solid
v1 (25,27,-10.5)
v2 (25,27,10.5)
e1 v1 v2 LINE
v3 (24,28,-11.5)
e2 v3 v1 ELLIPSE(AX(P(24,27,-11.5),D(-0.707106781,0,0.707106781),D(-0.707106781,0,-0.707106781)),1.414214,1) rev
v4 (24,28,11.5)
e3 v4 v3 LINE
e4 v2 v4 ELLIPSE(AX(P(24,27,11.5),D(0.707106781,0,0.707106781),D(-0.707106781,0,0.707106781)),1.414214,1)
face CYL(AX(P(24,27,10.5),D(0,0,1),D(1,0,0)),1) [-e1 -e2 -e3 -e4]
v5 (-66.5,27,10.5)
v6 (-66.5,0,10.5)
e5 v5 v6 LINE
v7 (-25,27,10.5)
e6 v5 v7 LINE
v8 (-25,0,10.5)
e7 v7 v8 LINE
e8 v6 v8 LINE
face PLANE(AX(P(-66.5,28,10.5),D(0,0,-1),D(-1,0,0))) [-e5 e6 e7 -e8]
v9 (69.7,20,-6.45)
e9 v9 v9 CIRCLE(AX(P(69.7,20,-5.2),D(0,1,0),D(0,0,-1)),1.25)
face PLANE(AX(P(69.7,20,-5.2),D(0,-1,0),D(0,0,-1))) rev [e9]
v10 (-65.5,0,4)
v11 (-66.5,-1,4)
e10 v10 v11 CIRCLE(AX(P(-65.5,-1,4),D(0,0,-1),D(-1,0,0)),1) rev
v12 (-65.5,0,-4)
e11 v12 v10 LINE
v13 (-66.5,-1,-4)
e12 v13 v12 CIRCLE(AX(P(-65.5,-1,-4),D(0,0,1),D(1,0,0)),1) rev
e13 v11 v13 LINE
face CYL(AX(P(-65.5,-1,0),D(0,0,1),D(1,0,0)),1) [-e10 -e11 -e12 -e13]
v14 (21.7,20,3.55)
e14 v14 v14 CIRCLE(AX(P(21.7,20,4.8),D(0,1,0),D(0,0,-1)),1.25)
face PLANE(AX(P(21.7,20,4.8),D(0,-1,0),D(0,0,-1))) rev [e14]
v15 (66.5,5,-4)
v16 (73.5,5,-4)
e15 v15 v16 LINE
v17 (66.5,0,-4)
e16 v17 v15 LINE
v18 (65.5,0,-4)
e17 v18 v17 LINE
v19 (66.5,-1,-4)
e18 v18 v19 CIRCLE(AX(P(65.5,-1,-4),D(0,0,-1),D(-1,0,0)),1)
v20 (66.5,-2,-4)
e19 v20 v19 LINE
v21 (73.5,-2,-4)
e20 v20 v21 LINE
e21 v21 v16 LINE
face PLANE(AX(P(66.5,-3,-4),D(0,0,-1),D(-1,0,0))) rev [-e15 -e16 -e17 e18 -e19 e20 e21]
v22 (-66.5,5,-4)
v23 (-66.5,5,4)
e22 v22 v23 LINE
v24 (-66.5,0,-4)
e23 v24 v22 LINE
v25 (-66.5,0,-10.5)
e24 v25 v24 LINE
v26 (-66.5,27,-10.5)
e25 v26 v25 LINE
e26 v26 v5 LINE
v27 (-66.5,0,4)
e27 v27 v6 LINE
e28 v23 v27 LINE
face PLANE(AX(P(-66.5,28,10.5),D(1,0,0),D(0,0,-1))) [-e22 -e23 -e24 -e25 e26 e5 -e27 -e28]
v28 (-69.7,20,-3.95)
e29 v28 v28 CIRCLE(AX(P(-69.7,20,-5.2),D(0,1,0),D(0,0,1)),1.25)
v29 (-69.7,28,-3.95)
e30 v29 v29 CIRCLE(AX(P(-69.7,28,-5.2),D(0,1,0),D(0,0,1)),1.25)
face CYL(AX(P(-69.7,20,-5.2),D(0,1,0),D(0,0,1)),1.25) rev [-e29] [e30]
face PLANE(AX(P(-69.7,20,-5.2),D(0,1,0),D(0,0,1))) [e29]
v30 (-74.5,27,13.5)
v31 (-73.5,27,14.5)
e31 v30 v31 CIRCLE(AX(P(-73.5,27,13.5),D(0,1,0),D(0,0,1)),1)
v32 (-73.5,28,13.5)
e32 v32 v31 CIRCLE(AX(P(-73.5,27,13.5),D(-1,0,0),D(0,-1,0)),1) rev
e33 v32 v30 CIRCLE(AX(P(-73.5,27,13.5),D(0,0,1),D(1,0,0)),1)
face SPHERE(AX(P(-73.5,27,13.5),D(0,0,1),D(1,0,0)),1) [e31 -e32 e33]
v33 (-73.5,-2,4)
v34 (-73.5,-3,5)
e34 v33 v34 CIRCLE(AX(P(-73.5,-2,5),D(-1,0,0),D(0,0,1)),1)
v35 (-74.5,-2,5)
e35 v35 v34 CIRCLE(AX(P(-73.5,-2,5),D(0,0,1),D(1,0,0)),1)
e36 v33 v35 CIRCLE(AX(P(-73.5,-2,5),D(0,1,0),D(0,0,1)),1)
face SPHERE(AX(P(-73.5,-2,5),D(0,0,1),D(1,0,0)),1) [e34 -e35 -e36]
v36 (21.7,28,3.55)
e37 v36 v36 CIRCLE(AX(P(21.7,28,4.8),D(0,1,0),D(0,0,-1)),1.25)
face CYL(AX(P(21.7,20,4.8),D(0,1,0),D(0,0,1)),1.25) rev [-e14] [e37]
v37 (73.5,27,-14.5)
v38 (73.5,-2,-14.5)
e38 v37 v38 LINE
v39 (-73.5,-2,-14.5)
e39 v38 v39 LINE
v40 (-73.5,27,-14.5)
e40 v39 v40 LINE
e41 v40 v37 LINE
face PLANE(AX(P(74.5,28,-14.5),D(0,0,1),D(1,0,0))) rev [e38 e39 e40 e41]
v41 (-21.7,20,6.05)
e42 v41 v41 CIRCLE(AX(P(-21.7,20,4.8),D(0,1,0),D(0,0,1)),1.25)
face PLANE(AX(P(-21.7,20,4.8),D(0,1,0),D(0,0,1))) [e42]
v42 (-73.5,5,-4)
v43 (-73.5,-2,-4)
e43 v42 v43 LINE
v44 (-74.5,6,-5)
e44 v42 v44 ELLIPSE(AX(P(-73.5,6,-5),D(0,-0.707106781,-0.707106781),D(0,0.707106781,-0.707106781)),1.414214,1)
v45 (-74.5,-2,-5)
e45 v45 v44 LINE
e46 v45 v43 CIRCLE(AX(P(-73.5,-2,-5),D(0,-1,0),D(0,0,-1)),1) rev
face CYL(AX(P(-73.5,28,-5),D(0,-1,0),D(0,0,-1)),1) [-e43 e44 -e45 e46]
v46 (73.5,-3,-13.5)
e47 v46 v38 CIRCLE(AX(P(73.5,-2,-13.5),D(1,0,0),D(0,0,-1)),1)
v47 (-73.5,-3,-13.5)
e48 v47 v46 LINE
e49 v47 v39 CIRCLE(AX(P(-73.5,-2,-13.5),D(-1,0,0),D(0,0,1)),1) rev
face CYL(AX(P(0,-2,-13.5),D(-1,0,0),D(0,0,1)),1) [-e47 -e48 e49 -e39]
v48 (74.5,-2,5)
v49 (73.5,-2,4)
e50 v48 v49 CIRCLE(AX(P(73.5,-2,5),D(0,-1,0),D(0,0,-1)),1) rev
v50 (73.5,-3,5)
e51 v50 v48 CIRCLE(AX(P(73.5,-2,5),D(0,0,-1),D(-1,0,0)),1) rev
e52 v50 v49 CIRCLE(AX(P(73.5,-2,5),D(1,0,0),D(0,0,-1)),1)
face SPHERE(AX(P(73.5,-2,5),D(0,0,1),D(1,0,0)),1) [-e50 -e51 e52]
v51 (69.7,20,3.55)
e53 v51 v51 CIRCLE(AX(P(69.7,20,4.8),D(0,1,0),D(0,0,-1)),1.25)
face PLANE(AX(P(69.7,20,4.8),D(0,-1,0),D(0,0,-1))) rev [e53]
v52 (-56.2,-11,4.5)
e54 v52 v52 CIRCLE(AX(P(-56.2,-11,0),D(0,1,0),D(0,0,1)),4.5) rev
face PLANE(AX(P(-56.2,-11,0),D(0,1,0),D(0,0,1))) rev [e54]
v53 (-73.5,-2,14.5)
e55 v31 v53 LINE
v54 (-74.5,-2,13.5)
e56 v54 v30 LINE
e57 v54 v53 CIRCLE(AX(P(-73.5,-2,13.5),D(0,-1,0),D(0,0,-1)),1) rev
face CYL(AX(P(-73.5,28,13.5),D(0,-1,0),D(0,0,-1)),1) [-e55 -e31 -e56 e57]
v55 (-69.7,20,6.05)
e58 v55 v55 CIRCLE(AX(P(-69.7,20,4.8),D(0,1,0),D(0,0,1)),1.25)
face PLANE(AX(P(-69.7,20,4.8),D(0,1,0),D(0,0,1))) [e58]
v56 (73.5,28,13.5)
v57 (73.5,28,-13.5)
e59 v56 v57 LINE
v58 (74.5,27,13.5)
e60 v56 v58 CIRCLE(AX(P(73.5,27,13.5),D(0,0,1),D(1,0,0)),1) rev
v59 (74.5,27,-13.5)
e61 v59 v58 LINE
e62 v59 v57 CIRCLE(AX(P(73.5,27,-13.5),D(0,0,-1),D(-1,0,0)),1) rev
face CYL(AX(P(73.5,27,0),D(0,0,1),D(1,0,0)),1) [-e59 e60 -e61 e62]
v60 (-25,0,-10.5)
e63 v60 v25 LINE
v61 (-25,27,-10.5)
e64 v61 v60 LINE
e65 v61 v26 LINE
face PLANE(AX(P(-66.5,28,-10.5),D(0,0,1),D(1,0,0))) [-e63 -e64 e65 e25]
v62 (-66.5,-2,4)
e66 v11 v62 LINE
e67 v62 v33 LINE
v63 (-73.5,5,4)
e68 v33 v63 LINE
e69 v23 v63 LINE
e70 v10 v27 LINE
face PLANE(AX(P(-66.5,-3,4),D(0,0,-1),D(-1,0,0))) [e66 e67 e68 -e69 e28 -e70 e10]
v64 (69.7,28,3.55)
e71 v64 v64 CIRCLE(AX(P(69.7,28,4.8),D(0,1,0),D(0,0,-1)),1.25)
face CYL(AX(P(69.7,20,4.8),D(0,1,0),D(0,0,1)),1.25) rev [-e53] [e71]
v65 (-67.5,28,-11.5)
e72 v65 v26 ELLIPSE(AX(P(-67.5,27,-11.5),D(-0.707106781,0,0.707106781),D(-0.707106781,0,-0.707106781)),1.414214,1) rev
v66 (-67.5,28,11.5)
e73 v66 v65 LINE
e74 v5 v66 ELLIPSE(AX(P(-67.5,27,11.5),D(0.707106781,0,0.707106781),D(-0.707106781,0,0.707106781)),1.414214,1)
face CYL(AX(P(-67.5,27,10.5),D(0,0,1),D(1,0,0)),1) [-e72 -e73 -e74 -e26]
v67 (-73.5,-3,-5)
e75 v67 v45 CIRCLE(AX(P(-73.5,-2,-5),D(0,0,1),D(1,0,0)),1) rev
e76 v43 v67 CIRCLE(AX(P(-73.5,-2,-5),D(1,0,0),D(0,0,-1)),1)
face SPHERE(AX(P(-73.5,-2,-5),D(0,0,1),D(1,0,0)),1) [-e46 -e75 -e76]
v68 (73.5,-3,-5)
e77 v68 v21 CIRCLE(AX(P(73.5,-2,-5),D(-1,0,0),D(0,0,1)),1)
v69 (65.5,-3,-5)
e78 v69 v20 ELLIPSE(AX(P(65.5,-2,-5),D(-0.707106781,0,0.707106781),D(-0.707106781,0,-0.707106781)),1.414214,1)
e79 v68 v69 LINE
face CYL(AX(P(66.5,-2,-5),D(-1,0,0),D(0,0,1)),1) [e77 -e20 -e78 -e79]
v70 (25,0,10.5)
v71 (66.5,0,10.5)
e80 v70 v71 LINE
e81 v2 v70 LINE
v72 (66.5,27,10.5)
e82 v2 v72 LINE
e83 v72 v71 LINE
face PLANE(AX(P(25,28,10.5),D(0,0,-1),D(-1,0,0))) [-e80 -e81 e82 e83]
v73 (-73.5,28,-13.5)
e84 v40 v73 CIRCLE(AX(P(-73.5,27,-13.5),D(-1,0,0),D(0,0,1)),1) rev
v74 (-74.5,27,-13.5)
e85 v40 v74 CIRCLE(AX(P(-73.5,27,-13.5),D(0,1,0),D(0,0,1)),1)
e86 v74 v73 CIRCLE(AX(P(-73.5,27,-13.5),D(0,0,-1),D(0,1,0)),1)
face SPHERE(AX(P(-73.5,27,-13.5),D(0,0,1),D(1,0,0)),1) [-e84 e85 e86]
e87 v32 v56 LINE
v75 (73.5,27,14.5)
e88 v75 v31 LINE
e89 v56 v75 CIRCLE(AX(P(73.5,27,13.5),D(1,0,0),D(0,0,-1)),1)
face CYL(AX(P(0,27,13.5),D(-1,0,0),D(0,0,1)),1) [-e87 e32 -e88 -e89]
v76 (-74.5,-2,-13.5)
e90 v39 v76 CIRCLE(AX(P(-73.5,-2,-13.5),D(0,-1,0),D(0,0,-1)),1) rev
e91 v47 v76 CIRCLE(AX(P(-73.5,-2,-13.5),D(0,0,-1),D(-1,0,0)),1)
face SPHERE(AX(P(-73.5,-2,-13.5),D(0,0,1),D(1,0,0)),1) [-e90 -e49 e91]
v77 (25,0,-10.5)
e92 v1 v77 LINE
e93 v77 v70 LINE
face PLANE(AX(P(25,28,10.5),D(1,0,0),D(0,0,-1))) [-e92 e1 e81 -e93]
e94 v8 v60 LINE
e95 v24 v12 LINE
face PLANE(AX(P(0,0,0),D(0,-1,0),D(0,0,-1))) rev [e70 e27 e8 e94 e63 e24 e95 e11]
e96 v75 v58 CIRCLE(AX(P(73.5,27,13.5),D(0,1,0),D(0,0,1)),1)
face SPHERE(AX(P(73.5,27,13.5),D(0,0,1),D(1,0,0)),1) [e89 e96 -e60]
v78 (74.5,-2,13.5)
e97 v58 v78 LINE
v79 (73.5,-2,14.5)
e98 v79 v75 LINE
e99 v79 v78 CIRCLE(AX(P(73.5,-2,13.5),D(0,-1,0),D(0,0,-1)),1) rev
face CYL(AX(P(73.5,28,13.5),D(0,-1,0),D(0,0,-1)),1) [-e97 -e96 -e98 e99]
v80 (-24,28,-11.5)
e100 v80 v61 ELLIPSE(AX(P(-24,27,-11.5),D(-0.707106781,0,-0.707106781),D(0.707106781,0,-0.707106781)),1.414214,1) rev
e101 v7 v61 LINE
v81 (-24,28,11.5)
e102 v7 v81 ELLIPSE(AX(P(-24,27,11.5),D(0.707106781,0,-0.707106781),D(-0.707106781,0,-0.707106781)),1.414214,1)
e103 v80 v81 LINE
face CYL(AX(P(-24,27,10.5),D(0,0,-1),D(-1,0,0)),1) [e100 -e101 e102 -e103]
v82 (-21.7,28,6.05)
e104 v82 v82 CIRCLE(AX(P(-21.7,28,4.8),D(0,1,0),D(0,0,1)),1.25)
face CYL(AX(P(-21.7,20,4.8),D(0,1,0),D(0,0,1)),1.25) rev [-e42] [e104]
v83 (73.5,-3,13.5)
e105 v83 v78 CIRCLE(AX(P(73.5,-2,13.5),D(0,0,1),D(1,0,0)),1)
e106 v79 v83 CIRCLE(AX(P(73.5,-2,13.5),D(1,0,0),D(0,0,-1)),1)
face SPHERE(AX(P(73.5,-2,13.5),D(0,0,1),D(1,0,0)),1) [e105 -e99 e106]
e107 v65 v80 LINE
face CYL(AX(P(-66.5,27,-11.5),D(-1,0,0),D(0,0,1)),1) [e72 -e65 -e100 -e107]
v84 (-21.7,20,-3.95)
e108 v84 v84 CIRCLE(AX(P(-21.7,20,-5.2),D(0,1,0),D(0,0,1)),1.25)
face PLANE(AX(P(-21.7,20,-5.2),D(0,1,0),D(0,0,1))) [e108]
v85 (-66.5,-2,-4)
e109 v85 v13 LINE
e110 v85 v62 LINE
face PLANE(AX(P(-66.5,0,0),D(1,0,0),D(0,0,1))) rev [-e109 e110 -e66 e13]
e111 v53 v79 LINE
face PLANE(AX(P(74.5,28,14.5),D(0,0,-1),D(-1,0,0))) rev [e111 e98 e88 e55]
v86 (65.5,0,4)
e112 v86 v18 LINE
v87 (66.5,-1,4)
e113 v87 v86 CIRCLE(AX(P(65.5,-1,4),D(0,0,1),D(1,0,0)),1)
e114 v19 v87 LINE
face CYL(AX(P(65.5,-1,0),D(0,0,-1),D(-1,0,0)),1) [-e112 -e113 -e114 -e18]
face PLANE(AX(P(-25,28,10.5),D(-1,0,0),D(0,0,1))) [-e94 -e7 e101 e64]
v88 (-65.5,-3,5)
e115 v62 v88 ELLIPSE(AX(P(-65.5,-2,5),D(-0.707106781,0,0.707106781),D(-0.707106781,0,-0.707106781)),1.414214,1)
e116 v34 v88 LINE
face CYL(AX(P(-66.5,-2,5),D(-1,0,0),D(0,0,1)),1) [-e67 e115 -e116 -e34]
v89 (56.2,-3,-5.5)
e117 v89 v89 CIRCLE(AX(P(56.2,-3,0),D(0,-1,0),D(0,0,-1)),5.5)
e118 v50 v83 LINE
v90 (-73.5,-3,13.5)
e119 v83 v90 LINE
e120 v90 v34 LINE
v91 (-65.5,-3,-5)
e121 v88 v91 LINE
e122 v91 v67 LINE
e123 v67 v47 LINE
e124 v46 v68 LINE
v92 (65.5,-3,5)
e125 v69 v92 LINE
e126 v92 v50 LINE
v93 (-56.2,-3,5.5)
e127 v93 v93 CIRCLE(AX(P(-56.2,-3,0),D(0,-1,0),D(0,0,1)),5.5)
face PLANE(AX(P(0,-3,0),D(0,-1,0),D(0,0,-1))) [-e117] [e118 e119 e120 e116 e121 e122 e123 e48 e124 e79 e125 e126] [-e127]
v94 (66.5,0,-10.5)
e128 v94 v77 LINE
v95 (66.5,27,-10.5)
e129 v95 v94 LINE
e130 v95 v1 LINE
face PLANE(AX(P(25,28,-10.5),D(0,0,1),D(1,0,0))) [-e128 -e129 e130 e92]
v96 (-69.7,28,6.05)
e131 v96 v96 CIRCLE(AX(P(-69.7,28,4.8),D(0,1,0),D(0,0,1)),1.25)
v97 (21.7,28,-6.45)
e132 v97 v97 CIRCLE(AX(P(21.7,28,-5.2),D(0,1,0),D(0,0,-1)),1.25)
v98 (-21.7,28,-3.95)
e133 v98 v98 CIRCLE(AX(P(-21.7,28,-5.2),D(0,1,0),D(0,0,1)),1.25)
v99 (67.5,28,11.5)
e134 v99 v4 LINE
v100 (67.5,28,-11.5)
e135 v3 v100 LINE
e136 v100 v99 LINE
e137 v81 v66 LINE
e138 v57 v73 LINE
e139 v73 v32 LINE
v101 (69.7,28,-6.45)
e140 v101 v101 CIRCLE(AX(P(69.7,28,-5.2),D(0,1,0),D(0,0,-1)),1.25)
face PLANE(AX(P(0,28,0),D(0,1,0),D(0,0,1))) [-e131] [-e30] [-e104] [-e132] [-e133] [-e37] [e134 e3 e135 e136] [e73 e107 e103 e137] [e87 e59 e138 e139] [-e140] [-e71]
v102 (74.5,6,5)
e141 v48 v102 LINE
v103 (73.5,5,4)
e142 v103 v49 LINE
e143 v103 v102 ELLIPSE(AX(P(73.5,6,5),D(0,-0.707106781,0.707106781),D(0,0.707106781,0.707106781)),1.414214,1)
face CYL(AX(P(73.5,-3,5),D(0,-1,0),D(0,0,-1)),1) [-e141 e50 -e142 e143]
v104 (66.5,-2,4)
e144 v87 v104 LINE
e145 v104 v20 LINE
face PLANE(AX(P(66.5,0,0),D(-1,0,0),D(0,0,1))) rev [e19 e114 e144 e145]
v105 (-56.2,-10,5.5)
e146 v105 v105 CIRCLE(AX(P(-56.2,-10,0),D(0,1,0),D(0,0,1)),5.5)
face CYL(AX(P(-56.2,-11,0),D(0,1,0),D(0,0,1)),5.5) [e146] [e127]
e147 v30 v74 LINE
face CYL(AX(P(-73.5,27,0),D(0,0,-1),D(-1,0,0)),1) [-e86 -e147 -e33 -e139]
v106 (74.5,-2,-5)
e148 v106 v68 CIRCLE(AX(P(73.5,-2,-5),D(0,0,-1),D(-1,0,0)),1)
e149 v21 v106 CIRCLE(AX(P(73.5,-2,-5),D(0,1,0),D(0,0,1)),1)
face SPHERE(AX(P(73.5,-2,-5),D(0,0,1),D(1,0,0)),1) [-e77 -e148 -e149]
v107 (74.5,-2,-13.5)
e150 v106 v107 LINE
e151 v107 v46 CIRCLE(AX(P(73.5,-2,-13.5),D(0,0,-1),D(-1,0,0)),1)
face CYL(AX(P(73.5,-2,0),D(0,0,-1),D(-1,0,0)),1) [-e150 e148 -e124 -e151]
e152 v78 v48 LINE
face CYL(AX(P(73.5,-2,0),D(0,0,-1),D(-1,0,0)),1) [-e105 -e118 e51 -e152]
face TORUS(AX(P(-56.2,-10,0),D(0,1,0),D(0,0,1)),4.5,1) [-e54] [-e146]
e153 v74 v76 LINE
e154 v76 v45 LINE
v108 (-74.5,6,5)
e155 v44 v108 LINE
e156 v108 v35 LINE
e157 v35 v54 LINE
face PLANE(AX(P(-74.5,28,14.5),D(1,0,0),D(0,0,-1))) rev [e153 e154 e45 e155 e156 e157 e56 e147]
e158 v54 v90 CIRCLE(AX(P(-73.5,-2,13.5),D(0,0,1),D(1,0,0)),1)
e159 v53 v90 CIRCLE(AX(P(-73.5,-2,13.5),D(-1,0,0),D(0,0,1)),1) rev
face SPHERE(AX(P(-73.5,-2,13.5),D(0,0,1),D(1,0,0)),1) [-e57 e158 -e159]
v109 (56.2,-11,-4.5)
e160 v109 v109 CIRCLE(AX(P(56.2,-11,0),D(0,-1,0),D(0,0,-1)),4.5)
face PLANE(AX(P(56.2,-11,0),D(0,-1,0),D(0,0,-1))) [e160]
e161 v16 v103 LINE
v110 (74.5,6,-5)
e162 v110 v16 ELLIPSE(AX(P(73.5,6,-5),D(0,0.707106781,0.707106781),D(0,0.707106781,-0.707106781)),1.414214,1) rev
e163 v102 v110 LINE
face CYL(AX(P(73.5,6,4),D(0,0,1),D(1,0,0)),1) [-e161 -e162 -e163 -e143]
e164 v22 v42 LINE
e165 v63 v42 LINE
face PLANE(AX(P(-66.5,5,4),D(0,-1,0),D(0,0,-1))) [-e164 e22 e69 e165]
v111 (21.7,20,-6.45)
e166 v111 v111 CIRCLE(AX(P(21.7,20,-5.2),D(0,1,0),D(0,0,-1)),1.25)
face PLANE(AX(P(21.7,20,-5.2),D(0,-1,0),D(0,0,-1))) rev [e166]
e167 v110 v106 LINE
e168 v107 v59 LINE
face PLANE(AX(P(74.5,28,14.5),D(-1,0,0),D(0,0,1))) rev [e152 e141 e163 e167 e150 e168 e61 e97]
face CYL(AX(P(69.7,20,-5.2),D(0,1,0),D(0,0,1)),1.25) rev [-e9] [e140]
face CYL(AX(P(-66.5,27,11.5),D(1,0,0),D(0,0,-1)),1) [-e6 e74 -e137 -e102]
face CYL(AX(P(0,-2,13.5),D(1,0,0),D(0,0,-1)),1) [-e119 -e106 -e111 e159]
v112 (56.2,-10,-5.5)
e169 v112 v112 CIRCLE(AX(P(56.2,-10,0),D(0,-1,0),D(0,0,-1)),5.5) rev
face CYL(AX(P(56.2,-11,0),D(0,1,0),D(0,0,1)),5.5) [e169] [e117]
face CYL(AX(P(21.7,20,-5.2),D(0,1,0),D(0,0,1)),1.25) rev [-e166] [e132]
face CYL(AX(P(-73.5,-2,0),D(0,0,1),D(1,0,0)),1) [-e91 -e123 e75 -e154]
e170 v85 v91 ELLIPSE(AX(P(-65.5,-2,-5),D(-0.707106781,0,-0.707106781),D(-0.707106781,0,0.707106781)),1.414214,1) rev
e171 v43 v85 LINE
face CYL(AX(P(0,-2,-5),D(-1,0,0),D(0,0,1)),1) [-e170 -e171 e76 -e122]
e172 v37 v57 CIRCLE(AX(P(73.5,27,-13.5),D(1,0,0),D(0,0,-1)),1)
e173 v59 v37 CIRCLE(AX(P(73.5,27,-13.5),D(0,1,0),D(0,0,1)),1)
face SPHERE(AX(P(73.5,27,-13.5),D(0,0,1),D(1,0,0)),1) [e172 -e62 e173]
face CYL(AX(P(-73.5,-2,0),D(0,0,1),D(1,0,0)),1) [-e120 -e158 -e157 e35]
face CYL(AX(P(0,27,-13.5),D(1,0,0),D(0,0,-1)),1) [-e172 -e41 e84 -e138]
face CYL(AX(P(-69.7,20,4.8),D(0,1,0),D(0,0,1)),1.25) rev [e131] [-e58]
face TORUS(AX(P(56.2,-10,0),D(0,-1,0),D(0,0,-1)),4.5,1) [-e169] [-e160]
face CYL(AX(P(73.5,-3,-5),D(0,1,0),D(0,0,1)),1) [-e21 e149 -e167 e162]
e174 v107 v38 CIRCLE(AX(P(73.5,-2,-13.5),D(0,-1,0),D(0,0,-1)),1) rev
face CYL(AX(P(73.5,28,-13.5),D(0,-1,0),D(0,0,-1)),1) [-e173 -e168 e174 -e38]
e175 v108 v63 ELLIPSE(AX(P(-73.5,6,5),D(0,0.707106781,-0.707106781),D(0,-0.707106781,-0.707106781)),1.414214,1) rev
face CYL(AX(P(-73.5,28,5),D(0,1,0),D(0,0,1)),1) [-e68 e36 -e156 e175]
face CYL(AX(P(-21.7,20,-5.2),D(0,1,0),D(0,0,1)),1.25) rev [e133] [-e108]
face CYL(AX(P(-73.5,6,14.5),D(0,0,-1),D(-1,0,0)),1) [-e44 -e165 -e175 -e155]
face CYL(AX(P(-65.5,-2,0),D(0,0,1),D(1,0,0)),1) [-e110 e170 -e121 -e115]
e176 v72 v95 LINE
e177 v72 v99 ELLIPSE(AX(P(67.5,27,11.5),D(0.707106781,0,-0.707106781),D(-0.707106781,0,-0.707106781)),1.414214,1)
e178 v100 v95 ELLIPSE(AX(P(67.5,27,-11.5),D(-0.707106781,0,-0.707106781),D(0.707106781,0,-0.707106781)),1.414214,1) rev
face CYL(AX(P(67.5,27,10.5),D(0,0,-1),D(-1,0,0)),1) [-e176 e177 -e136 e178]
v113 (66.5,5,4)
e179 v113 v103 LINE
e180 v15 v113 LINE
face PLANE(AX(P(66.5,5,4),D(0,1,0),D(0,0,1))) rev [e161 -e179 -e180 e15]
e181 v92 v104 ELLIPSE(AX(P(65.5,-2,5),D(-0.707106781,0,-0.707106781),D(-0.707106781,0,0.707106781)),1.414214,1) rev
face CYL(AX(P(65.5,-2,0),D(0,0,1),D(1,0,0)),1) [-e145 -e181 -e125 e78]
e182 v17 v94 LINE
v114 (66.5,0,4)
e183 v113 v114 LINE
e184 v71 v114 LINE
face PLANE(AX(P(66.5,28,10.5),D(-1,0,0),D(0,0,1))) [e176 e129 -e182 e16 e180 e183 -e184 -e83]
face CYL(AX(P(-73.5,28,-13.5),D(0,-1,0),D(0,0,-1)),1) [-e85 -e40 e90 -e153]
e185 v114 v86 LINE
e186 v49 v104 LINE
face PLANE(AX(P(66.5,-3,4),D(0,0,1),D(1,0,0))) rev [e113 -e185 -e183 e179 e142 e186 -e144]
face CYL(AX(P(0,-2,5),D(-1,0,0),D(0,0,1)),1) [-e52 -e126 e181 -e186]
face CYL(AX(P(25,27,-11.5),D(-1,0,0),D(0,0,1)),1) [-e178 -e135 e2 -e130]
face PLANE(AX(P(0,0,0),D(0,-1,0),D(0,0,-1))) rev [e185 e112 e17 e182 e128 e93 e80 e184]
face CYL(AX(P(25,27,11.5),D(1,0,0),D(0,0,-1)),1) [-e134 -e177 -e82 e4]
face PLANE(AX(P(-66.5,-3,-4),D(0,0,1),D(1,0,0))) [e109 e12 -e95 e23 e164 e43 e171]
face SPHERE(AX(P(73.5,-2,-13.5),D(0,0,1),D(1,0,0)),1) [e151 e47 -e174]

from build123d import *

# Parameters (mm, degrees)
SKETCH_1_W          = 149
SKETCH_1_H          = 29
SKETCH_1_W_2        = 41.5
SKETCH_1_H_2        = 21
EXTRUDE_1_DEPTH     = 28
SKETCH_2_W          = 149
SKETCH_2_H          = 29
EXTRUDE_2_DEPTH     = 3
SKETCH_3_W          = 8
SKETCH_3_H          = 8
CUT_EXTRUDE_1_DEPTH = 8
SKETCH_4_R          = 5.5
EXTRUDE_3_DEPTH     = 8
FILLET_1_R          = 1
FILLET_5_R          = 1
FILLET_6_R          = 1
SKETCH_5_R          = 1.25
CUT_EXTRUDE_2_DEPTH = 8


with BuildPart() as part:
    # 草图1 → 凸台-拉伸1 (new body)
    with BuildSketch(Plane(origin=(0, 0, 0), x_dir=(1, 0, 0), z_dir=(0, 1, 0))):
        Rectangle(SKETCH_1_W, SKETCH_1_H)
        with Locations((-45.75, 0)):
            Rectangle(SKETCH_1_W_2, SKETCH_1_H_2, mode=Mode.SUBTRACT)
        with Locations((45.75, 0)):
            Rectangle(SKETCH_1_W_2, SKETCH_1_H_2, mode=Mode.SUBTRACT)
    extrude(amount=EXTRUDE_1_DEPTH)

    # 草图2 → 凸台-拉伸2 (add)
    with BuildSketch(Plane.XZ):
        Rectangle(SKETCH_2_W, SKETCH_2_H)
    extrude(amount=EXTRUDE_2_DEPTH)

    # 草图3 → 切除-拉伸1 (cut)
    with BuildSketch(Plane(origin=(74.5, 0, 0), x_dir=(0, 0, -1), z_dir=(1, 0, 0))):
        with Locations((0, 1)):
            Rectangle(SKETCH_3_W, SKETCH_3_H)
    cut_extrude_1 = extrude(amount=-CUT_EXTRUDE_1_DEPTH, mode=Mode.SUBTRACT)

    # 镜向1: 切除-拉伸1 across plane
    add(cut_extrude_1.mirror(Plane(origin=(0, 0, 0), x_dir=(0, 0, 1), z_dir=(1, 0, 0))), mode=Mode.SUBTRACT)

    # 草图4 → 凸台-拉伸3 (add)
    with BuildSketch(Plane(origin=(0, -3, 0), x_dir=(-1, 0, 0), z_dir=(0, -1, 0))):
        with Locations(Location((-56.2, 0, 0), (0, 0, 90))):
            Circle(SKETCH_4_R)
        with Locations(Location((56.2, 0, 0), (0, 0, 270))):
            Circle(SKETCH_4_R)
    extrude(amount=EXTRUDE_3_DEPTH)

    # 圆角1
    fillet_1_edges = [part.edges().sort_by_distance(p)[0] for p in [
        (-56.2, -11, -5.5),
        (56.2, -11, 5.5),
    ]]
    fillet(fillet_1_edges, radius=FILLET_1_R)

    # 圆角5
    fillet_5_edges = [part.edges().sort_by_distance(p)[0] for p in [
        (74.5, 28, 0),
        (0, 28, -14.5),
        (-66.5, 28, 0),
        (-45.75, 28, 10.5),
        (-25, 28, 0),
        (-45.75, 28, -10.5),
        (25, 28, 0),
        (45.75, 28, 10.5),
        (66.5, 28, 0),
        (45.75, 28, -10.5),
        (-74.5, 28, 0),
        (-74.5, -3, 9.25),
        (0, -3, -14.5),
        (74.5, -3, -9.25),
        (0, -3, 14.5),
        (74.5, -3, 9.25),
        (74.5, 1, 4),
        (74.5, 1, -4),
        (74.5, 5, 0),
        (0, 28, 14.5),
        (-74.5, 12.5, -14.5),
        (74.5, 12.5, -14.5),
        (74.5, 12.5, 14.5),
        (-74.5, 12.5, 14.5),
        (-74.5, -3, -9.25),
        (-74.5, 1, 4),
        (-74.5, 1, -4),
        (-74.5, 5, 0),
    ]]
    fillet(fillet_5_edges, radius=FILLET_5_R)

    # 圆角6
    # the kernel refuses this fillet: 1 mm, written as the material it takes off along each edge
    with BuildSketch(Plane(origin=(-73.5, -2, 5), x_dir=(0, 0, -1), z_dir=(0, -1, 0))) as fillet_6_piece_1_section:
        Polygon((0, 0), (FILLET_6_R * 1.02, 0), (FILLET_6_R * 1.02, -FILLET_6_R * 1.02), (0, -FILLET_6_R * 1.02), align=None)
    fillet_6_piece_1 = extrude(amount=FILLET_6_R * 1.02, mode=Mode.PRIVATE)
    fillet_6_piece_1 = fillet_6_piece_1 - Plane(origin=(-73.5, -2, 5), x_dir=(0.7071067811865475, 0, 0.7071067811865475), z_dir=(0, -1, 0)) * Sphere(FILLET_6_R, mode=Mode.PRIVATE)
    add(fillet_6_piece_1, mode=Mode.SUBTRACT)
    with BuildSketch(Plane(origin=(-73.5, -2, -5), x_dir=(0, 0, 1), z_dir=(0, -1, 0))) as fillet_6_piece_2_section:
        Polygon((0, 0), (FILLET_6_R * 1.02, 0), (FILLET_6_R * 1.02, FILLET_6_R * 1.02), (0, FILLET_6_R * 1.02), align=None)
    fillet_6_piece_2 = extrude(amount=FILLET_6_R * 1.02, mode=Mode.PRIVATE)
    fillet_6_piece_2 = fillet_6_piece_2 - Plane(origin=(-73.5, -2, -5), x_dir=(0.7071067811865475, 0, -0.7071067811865475), z_dir=(0, -1, 0)) * Sphere(FILLET_6_R, mode=Mode.PRIVATE)
    add(fillet_6_piece_2, mode=Mode.SUBTRACT)
    with BuildSketch(Plane(origin=(73.5, -2, 5), x_dir=(0, 0, -1), z_dir=(0, -1, 0))) as fillet_6_piece_3_section:
        Polygon((0, 0), (FILLET_6_R * 1.02, 0), (FILLET_6_R * 1.02, FILLET_6_R * 1.02), (0, FILLET_6_R * 1.02), align=None)
    fillet_6_piece_3 = extrude(amount=FILLET_6_R * 1.02, mode=Mode.PRIVATE)
    fillet_6_piece_3 = fillet_6_piece_3 - Plane(origin=(73.5, -2, 5), x_dir=(-0.7071067811865475, 0, 0.7071067811865475), z_dir=(0, -1, 0)) * Sphere(FILLET_6_R, mode=Mode.PRIVATE)
    add(fillet_6_piece_3, mode=Mode.SUBTRACT)
    with BuildSketch(Plane(origin=(73.5, -2, -5), x_dir=(0, 0, 1), z_dir=(0, -1, 0))) as fillet_6_piece_4_section:
        Polygon((0, 0), (FILLET_6_R * 1.02, 0), (FILLET_6_R * 1.02, -FILLET_6_R * 1.02), (0, -FILLET_6_R * 1.02), align=None)
    fillet_6_piece_4 = extrude(amount=FILLET_6_R * 1.02, mode=Mode.PRIVATE)
    fillet_6_piece_4 = fillet_6_piece_4 - Plane(origin=(73.5, -2, -5), x_dir=(-0.7071067811865475, 0, -0.7071067811865475), z_dir=(0, -1, 0)) * Sphere(FILLET_6_R, mode=Mode.PRIVATE)
    add(fillet_6_piece_4, mode=Mode.SUBTRACT)
    with BuildSketch(Plane(origin=(66.5, 0, 4), x_dir=(0, -1, 0), z_dir=(0, 0, -1))) as fillet_6_piece_5_section:
        with BuildLine():
            CenterArc((FILLET_6_R, FILLET_6_R), FILLET_6_R, 180, 90)
            Line((0, FILLET_6_R), (-FILLET_6_R * 0.02, FILLET_6_R))
            Line((-FILLET_6_R * 0.02, FILLET_6_R), (-FILLET_6_R * 0.02, -FILLET_6_R * 0.02))
            Line((-FILLET_6_R * 0.02, -FILLET_6_R * 0.02), (FILLET_6_R, -FILLET_6_R * 0.02))
            Line((FILLET_6_R, -FILLET_6_R * 0.02), (FILLET_6_R, 0))
        make_face()
    fillet_6_piece_5 = extrude(amount=8, mode=Mode.PRIVATE)
    fillet_6_piece_5 = split(fillet_6_piece_5, bisect_by=Plane(origin=(66.5, -0.20347313, 0), z_dir=(-1, 0, 0)), keep=Keep.TOP, mode=Mode.PRIVATE)
    add(fillet_6_piece_5, mode=Mode.SUBTRACT)
    with BuildSketch(Plane(origin=(73.5, -3, 4), x_dir=(0, 0, 1), z_dir=(-1, 0, 0)), Plane(origin=(-73.5, -3, -4), x_dir=(0, 0, -1), z_dir=(1, 0, 0))) as fillet_6_piece_6:
        with BuildLine():
            CenterArc((FILLET_6_R, FILLET_6_R), FILLET_6_R, 180, 90)
            Line((0, FILLET_6_R), (-FILLET_6_R * 0.02, FILLET_6_R))
            Line((-FILLET_6_R * 0.02, FILLET_6_R), (-FILLET_6_R * 0.02, -FILLET_6_R * 0.02))
            Line((-FILLET_6_R * 0.02, -FILLET_6_R * 0.02), (FILLET_6_R, -FILLET_6_R * 0.02))
            Line((FILLET_6_R, -FILLET_6_R * 0.02), (FILLET_6_R, 0))
        make_face()
    extrude(amount=7, mode=Mode.SUBTRACT)
    with BuildSketch(Plane(origin=(66.5, -3, 4), x_dir=(-1, 0, 0), z_dir=(0, 0, -1))) as fillet_6_piece_7:
        with BuildLine():
            CenterArc((FILLET_6_R, FILLET_6_R), FILLET_6_R, 180, 90)
            Line((0, FILLET_6_R), (-FILLET_6_R * 0.02, FILLET_6_R))
            Line((-FILLET_6_R * 0.02, FILLET_6_R), (-FILLET_6_R * 0.02, -FILLET_6_R * 0.02))
            Line((-FILLET_6_R * 0.02, -FILLET_6_R * 0.02), (FILLET_6_R, -FILLET_6_R * 0.02))
            Line((FILLET_6_R, -FILLET_6_R * 0.02), (FILLET_6_R, 0))
        make_face()
    extrude(amount=8, mode=Mode.SUBTRACT)
    with BuildSketch(Plane(origin=(73.5, -3, -4), x_dir=(0, 0, -1), z_dir=(-1, 0, 0)), Plane(origin=(-73.5, -3, 4), x_dir=(0, 0, 1), z_dir=(1, 0, 0))) as fillet_6_piece_8:
        with BuildLine():
            CenterArc((FILLET_6_R, -FILLET_6_R), FILLET_6_R, 90, 90)
            Line((0, -FILLET_6_R), (-FILLET_6_R * 0.02, -FILLET_6_R))
            Line((-FILLET_6_R * 0.02, -FILLET_6_R), (-FILLET_6_R * 0.02, FILLET_6_R * 0.02))
            Line((-FILLET_6_R * 0.02, FILLET_6_R * 0.02), (FILLET_6_R, FILLET_6_R * 0.02))
            Line((FILLET_6_R, FILLET_6_R * 0.02), (FILLET_6_R, 0))
        make_face()
    extrude(amount=7, mode=Mode.SUBTRACT)
    with BuildSketch(Plane(origin=(-66.5, 0, -4), x_dir=(0, -1, 0), z_dir=(0, 0, 1))) as fillet_6_piece_9_section:
        with BuildLine():
            CenterArc((FILLET_6_R, FILLET_6_R), FILLET_6_R, 180, 90)
            Line((0, FILLET_6_R), (-FILLET_6_R * 0.02, FILLET_6_R))
            Line((-FILLET_6_R * 0.02, FILLET_6_R), (-FILLET_6_R * 0.02, -FILLET_6_R * 0.02))
            Line((-FILLET_6_R * 0.02, -FILLET_6_R * 0.02), (FILLET_6_R, -FILLET_6_R * 0.02))
            Line((FILLET_6_R, -FILLET_6_R * 0.02), (FILLET_6_R, 0))
        make_face()
    fillet_6_piece_9 = extrude(amount=8, mode=Mode.PRIVATE)
    fillet_6_piece_9 = split(fillet_6_piece_9, bisect_by=Plane(origin=(-66.5, -0.20347313, 0), z_dir=(1, 0, 0)), keep=Keep.TOP, mode=Mode.PRIVATE)
    add(fillet_6_piece_9, mode=Mode.SUBTRACT)
    with BuildSketch(Plane(origin=(-66.5, -3, 4), x_dir=(1, 0, 0), z_dir=(0, 0, -1))) as fillet_6_piece_10:
        with BuildLine():
            CenterArc((FILLET_6_R, -FILLET_6_R), FILLET_6_R, 90, 90)
            Line((0, -FILLET_6_R), (-FILLET_6_R * 0.02, -FILLET_6_R))
            Line((-FILLET_6_R * 0.02, -FILLET_6_R), (-FILLET_6_R * 0.02, FILLET_6_R * 0.02))
            Line((-FILLET_6_R * 0.02, FILLET_6_R * 0.02), (FILLET_6_R, FILLET_6_R * 0.02))
            Line((FILLET_6_R, FILLET_6_R * 0.02), (FILLET_6_R, 0))
        make_face()
    extrude(amount=8, mode=Mode.SUBTRACT)
    with BuildSketch(Plane(origin=(66.5, -3, 6.5), x_dir=(-1, 0, 0), z_dir=(0, 0, -1))) as fillet_6_piece_11a_section:
        with BuildLine():
            CenterArc((FILLET_6_R, FILLET_6_R), FILLET_6_R, 180, 90)
            Line((0, FILLET_6_R), (-FILLET_6_R * 0.02, FILLET_6_R))
            Line((-FILLET_6_R * 0.02, FILLET_6_R), (-FILLET_6_R * 0.02, -FILLET_6_R * 0.02))
            Line((-FILLET_6_R * 0.02, -FILLET_6_R * 0.02), (FILLET_6_R, -FILLET_6_R * 0.02))
            Line((FILLET_6_R, -FILLET_6_R * 0.02), (FILLET_6_R, 0))
        make_face()
    fillet_6_piece_11a = extrude(amount=10.5, mode=Mode.PRIVATE)
    fillet_6_piece_11a = split(fillet_6_piece_11a, bisect_by=Plane(origin=(66.273604886, -2.773604886, 4), z_dir=(0, 0, 1)), keep=Keep.TOP, mode=Mode.PRIVATE)
    with BuildSketch(Plane(origin=(73.5, -3, 4), x_dir=(0, 0, 1), z_dir=(-1, 0, 0))) as fillet_6_piece_11b_section:
        with BuildLine():
            CenterArc((FILLET_6_R, FILLET_6_R), FILLET_6_R, 180, 90)
            Line((0, FILLET_6_R), (-FILLET_6_R * 0.02, FILLET_6_R))
            Line((-FILLET_6_R * 0.02, FILLET_6_R), (-FILLET_6_R * 0.02, -FILLET_6_R * 0.02))
            Line((-FILLET_6_R * 0.02, -FILLET_6_R * 0.02), (FILLET_6_R, -FILLET_6_R * 0.02))
            Line((FILLET_6_R, -FILLET_6_R * 0.02), (FILLET_6_R, 0))
        make_face()
    fillet_6_piece_11b = extrude(amount=9.5, mode=Mode.PRIVATE)
    fillet_6_piece_11b = split(fillet_6_piece_11b, bisect_by=Plane(origin=(66.5, -2.773604886, 4.226395114), z_dir=(-1, 0, 0)), keep=Keep.TOP, mode=Mode.PRIVATE)
    fillet_6_piece_11 = fillet_6_piece_11a & fillet_6_piece_11b
    add(fillet_6_piece_11, mode=Mode.SUBTRACT)
    with BuildSketch(Plane(origin=(73.5, -3, -4), x_dir=(0, 0, -1), z_dir=(-1, 0, 0))) as fillet_6_piece_12a_section:
        with BuildLine():
            CenterArc((FILLET_6_R, -FILLET_6_R), FILLET_6_R, 90, 90)
            Line((0, -FILLET_6_R), (-FILLET_6_R * 0.02, -FILLET_6_R))
            Line((-FILLET_6_R * 0.02, -FILLET_6_R), (-FILLET_6_R * 0.02, FILLET_6_R * 0.02))
            Line((-FILLET_6_R * 0.02, FILLET_6_R * 0.02), (FILLET_6_R, FILLET_6_R * 0.02))
            Line((FILLET_6_R, FILLET_6_R * 0.02), (FILLET_6_R, 0))
        make_face()
    fillet_6_piece_12a = extrude(amount=9.5, mode=Mode.PRIVATE)
    fillet_6_piece_12a = split(fillet_6_piece_12a, bisect_by=Plane(origin=(66.5, -2.773604886, -4.226395114), z_dir=(-1, 0, 0)), keep=Keep.TOP, mode=Mode.PRIVATE)
    with BuildSketch(Plane(origin=(66.5, -3, 4), x_dir=(-1, 0, 0), z_dir=(0, 0, -1))) as fillet_6_piece_12b_section:
        with BuildLine():
            CenterArc((FILLET_6_R, FILLET_6_R), FILLET_6_R, 180, 90)
            Line((0, FILLET_6_R), (-FILLET_6_R * 0.02, FILLET_6_R))
            Line((-FILLET_6_R * 0.02, FILLET_6_R), (-FILLET_6_R * 0.02, -FILLET_6_R * 0.02))
            Line((-FILLET_6_R * 0.02, -FILLET_6_R * 0.02), (FILLET_6_R, -FILLET_6_R * 0.02))
            Line((FILLET_6_R, -FILLET_6_R * 0.02), (FILLET_6_R, 0))
        make_face()
    fillet_6_piece_12b = extrude(amount=10.5, mode=Mode.PRIVATE)
    fillet_6_piece_12b = split(fillet_6_piece_12b, bisect_by=Plane(origin=(66.273604886, -2.773604886, -4), z_dir=(0, 0, -1)), keep=Keep.TOP, mode=Mode.PRIVATE)
    fillet_6_piece_12 = fillet_6_piece_12a & fillet_6_piece_12b
    add(fillet_6_piece_12, mode=Mode.SUBTRACT)
    with BuildSketch(Plane(origin=(-66.5, -3, 6.5), x_dir=(1, 0, 0), z_dir=(0, 0, -1))) as fillet_6_piece_13a_section:
        with BuildLine():
            CenterArc((FILLET_6_R, -FILLET_6_R), FILLET_6_R, 90, 90)
            Line((0, -FILLET_6_R), (-FILLET_6_R * 0.02, -FILLET_6_R))
            Line((-FILLET_6_R * 0.02, -FILLET_6_R), (-FILLET_6_R * 0.02, FILLET_6_R * 0.02))
            Line((-FILLET_6_R * 0.02, FILLET_6_R * 0.02), (FILLET_6_R, FILLET_6_R * 0.02))
            Line((FILLET_6_R, FILLET_6_R * 0.02), (FILLET_6_R, 0))
        make_face()
    fillet_6_piece_13a = extrude(amount=10.5, mode=Mode.PRIVATE)
    fillet_6_piece_13a = split(fillet_6_piece_13a, bisect_by=Plane(origin=(-66.273604886, -2.773604886, 4), z_dir=(0, 0, 1)), keep=Keep.TOP, mode=Mode.PRIVATE)
    with BuildSketch(Plane(origin=(-73.5, -3, 4), x_dir=(0, 0, 1), z_dir=(1, 0, 0))) as fillet_6_piece_13b_section:
        with BuildLine():
            CenterArc((FILLET_6_R, -FILLET_6_R), FILLET_6_R, 90, 90)
            Line((0, -FILLET_6_R), (-FILLET_6_R * 0.02, -FILLET_6_R))
            Line((-FILLET_6_R * 0.02, -FILLET_6_R), (-FILLET_6_R * 0.02, FILLET_6_R * 0.02))
            Line((-FILLET_6_R * 0.02, FILLET_6_R * 0.02), (FILLET_6_R, FILLET_6_R * 0.02))
            Line((FILLET_6_R, FILLET_6_R * 0.02), (FILLET_6_R, 0))
        make_face()
    fillet_6_piece_13b = extrude(amount=9.5, mode=Mode.PRIVATE)
    fillet_6_piece_13b = split(fillet_6_piece_13b, bisect_by=Plane(origin=(-66.5, -2.773604886, 4.226395114), z_dir=(1, 0, 0)), keep=Keep.TOP, mode=Mode.PRIVATE)
    fillet_6_piece_13 = fillet_6_piece_13a & fillet_6_piece_13b
    add(fillet_6_piece_13, mode=Mode.SUBTRACT)
    with BuildSketch(Plane(origin=(-73.5, -3, -4), x_dir=(0, 0, -1), z_dir=(1, 0, 0))) as fillet_6_piece_14a_section:
        with BuildLine():
            CenterArc((FILLET_6_R, FILLET_6_R), FILLET_6_R, 180, 90)
            Line((0, FILLET_6_R), (-FILLET_6_R * 0.02, FILLET_6_R))
            Line((-FILLET_6_R * 0.02, FILLET_6_R), (-FILLET_6_R * 0.02, -FILLET_6_R * 0.02))
            Line((-FILLET_6_R * 0.02, -FILLET_6_R * 0.02), (FILLET_6_R, -FILLET_6_R * 0.02))
            Line((FILLET_6_R, -FILLET_6_R * 0.02), (FILLET_6_R, 0))
        make_face()
    fillet_6_piece_14a = extrude(amount=9.5, mode=Mode.PRIVATE)
    fillet_6_piece_14a = split(fillet_6_piece_14a, bisect_by=Plane(origin=(-66.5, -2.773604886, -4.226395114), z_dir=(1, 0, 0)), keep=Keep.TOP, mode=Mode.PRIVATE)
    with BuildSketch(Plane(origin=(-66.5, -3, 4), x_dir=(1, 0, 0), z_dir=(0, 0, -1))) as fillet_6_piece_14b_section:
        with BuildLine():
            CenterArc((FILLET_6_R, -FILLET_6_R), FILLET_6_R, 90, 90)
            Line((0, -FILLET_6_R), (-FILLET_6_R * 0.02, -FILLET_6_R))
            Line((-FILLET_6_R * 0.02, -FILLET_6_R), (-FILLET_6_R * 0.02, FILLET_6_R * 0.02))
            Line((-FILLET_6_R * 0.02, FILLET_6_R * 0.02), (FILLET_6_R, FILLET_6_R * 0.02))
            Line((FILLET_6_R, FILLET_6_R * 0.02), (FILLET_6_R, 0))
        make_face()
    fillet_6_piece_14b = extrude(amount=10.5, mode=Mode.PRIVATE)
    fillet_6_piece_14b = split(fillet_6_piece_14b, bisect_by=Plane(origin=(-66.273604886, -2.773604886, -4), z_dir=(0, 0, -1)), keep=Keep.TOP, mode=Mode.PRIVATE)
    fillet_6_piece_14 = fillet_6_piece_14a & fillet_6_piece_14b
    add(fillet_6_piece_14, mode=Mode.SUBTRACT)

    # 草图5 → 切除-拉伸2 (cut)
    with BuildSketch(Plane(origin=(0, 28, 0), x_dir=(1, 0, 0), z_dir=(0, 1, 0))):
        with Locations(Location((-69.7, 5.2, 0), (0, 0, 270))):
            Circle(SKETCH_5_R)
        with Locations(Location((-69.7, -4.8, 0), (0, 0, 270))):
            Circle(SKETCH_5_R)
        with Locations(Location((-21.7, 5.2, 0), (0, 0, 270))):
            Circle(SKETCH_5_R)
        with Locations(Location((-21.7, -4.8, 0), (0, 0, 270))):
            Circle(SKETCH_5_R)
        with Locations(Location((21.7, -4.8, 0), (0, 0, 90))):
            Circle(SKETCH_5_R)
        with Locations(Location((21.7, 5.2, 0), (0, 0, 90))):
            Circle(SKETCH_5_R)
        with Locations(Location((69.7, -4.8, 0), (0, 0, 90))):
            Circle(SKETCH_5_R)
        with Locations(Location((69.7, 5.2, 0), (0, 0, 90))):
            Circle(SKETCH_5_R)
    extrude(amount=-CUT_EXTRUDE_2_DEPTH, mode=Mode.SUBTRACT)


solid = part.part
